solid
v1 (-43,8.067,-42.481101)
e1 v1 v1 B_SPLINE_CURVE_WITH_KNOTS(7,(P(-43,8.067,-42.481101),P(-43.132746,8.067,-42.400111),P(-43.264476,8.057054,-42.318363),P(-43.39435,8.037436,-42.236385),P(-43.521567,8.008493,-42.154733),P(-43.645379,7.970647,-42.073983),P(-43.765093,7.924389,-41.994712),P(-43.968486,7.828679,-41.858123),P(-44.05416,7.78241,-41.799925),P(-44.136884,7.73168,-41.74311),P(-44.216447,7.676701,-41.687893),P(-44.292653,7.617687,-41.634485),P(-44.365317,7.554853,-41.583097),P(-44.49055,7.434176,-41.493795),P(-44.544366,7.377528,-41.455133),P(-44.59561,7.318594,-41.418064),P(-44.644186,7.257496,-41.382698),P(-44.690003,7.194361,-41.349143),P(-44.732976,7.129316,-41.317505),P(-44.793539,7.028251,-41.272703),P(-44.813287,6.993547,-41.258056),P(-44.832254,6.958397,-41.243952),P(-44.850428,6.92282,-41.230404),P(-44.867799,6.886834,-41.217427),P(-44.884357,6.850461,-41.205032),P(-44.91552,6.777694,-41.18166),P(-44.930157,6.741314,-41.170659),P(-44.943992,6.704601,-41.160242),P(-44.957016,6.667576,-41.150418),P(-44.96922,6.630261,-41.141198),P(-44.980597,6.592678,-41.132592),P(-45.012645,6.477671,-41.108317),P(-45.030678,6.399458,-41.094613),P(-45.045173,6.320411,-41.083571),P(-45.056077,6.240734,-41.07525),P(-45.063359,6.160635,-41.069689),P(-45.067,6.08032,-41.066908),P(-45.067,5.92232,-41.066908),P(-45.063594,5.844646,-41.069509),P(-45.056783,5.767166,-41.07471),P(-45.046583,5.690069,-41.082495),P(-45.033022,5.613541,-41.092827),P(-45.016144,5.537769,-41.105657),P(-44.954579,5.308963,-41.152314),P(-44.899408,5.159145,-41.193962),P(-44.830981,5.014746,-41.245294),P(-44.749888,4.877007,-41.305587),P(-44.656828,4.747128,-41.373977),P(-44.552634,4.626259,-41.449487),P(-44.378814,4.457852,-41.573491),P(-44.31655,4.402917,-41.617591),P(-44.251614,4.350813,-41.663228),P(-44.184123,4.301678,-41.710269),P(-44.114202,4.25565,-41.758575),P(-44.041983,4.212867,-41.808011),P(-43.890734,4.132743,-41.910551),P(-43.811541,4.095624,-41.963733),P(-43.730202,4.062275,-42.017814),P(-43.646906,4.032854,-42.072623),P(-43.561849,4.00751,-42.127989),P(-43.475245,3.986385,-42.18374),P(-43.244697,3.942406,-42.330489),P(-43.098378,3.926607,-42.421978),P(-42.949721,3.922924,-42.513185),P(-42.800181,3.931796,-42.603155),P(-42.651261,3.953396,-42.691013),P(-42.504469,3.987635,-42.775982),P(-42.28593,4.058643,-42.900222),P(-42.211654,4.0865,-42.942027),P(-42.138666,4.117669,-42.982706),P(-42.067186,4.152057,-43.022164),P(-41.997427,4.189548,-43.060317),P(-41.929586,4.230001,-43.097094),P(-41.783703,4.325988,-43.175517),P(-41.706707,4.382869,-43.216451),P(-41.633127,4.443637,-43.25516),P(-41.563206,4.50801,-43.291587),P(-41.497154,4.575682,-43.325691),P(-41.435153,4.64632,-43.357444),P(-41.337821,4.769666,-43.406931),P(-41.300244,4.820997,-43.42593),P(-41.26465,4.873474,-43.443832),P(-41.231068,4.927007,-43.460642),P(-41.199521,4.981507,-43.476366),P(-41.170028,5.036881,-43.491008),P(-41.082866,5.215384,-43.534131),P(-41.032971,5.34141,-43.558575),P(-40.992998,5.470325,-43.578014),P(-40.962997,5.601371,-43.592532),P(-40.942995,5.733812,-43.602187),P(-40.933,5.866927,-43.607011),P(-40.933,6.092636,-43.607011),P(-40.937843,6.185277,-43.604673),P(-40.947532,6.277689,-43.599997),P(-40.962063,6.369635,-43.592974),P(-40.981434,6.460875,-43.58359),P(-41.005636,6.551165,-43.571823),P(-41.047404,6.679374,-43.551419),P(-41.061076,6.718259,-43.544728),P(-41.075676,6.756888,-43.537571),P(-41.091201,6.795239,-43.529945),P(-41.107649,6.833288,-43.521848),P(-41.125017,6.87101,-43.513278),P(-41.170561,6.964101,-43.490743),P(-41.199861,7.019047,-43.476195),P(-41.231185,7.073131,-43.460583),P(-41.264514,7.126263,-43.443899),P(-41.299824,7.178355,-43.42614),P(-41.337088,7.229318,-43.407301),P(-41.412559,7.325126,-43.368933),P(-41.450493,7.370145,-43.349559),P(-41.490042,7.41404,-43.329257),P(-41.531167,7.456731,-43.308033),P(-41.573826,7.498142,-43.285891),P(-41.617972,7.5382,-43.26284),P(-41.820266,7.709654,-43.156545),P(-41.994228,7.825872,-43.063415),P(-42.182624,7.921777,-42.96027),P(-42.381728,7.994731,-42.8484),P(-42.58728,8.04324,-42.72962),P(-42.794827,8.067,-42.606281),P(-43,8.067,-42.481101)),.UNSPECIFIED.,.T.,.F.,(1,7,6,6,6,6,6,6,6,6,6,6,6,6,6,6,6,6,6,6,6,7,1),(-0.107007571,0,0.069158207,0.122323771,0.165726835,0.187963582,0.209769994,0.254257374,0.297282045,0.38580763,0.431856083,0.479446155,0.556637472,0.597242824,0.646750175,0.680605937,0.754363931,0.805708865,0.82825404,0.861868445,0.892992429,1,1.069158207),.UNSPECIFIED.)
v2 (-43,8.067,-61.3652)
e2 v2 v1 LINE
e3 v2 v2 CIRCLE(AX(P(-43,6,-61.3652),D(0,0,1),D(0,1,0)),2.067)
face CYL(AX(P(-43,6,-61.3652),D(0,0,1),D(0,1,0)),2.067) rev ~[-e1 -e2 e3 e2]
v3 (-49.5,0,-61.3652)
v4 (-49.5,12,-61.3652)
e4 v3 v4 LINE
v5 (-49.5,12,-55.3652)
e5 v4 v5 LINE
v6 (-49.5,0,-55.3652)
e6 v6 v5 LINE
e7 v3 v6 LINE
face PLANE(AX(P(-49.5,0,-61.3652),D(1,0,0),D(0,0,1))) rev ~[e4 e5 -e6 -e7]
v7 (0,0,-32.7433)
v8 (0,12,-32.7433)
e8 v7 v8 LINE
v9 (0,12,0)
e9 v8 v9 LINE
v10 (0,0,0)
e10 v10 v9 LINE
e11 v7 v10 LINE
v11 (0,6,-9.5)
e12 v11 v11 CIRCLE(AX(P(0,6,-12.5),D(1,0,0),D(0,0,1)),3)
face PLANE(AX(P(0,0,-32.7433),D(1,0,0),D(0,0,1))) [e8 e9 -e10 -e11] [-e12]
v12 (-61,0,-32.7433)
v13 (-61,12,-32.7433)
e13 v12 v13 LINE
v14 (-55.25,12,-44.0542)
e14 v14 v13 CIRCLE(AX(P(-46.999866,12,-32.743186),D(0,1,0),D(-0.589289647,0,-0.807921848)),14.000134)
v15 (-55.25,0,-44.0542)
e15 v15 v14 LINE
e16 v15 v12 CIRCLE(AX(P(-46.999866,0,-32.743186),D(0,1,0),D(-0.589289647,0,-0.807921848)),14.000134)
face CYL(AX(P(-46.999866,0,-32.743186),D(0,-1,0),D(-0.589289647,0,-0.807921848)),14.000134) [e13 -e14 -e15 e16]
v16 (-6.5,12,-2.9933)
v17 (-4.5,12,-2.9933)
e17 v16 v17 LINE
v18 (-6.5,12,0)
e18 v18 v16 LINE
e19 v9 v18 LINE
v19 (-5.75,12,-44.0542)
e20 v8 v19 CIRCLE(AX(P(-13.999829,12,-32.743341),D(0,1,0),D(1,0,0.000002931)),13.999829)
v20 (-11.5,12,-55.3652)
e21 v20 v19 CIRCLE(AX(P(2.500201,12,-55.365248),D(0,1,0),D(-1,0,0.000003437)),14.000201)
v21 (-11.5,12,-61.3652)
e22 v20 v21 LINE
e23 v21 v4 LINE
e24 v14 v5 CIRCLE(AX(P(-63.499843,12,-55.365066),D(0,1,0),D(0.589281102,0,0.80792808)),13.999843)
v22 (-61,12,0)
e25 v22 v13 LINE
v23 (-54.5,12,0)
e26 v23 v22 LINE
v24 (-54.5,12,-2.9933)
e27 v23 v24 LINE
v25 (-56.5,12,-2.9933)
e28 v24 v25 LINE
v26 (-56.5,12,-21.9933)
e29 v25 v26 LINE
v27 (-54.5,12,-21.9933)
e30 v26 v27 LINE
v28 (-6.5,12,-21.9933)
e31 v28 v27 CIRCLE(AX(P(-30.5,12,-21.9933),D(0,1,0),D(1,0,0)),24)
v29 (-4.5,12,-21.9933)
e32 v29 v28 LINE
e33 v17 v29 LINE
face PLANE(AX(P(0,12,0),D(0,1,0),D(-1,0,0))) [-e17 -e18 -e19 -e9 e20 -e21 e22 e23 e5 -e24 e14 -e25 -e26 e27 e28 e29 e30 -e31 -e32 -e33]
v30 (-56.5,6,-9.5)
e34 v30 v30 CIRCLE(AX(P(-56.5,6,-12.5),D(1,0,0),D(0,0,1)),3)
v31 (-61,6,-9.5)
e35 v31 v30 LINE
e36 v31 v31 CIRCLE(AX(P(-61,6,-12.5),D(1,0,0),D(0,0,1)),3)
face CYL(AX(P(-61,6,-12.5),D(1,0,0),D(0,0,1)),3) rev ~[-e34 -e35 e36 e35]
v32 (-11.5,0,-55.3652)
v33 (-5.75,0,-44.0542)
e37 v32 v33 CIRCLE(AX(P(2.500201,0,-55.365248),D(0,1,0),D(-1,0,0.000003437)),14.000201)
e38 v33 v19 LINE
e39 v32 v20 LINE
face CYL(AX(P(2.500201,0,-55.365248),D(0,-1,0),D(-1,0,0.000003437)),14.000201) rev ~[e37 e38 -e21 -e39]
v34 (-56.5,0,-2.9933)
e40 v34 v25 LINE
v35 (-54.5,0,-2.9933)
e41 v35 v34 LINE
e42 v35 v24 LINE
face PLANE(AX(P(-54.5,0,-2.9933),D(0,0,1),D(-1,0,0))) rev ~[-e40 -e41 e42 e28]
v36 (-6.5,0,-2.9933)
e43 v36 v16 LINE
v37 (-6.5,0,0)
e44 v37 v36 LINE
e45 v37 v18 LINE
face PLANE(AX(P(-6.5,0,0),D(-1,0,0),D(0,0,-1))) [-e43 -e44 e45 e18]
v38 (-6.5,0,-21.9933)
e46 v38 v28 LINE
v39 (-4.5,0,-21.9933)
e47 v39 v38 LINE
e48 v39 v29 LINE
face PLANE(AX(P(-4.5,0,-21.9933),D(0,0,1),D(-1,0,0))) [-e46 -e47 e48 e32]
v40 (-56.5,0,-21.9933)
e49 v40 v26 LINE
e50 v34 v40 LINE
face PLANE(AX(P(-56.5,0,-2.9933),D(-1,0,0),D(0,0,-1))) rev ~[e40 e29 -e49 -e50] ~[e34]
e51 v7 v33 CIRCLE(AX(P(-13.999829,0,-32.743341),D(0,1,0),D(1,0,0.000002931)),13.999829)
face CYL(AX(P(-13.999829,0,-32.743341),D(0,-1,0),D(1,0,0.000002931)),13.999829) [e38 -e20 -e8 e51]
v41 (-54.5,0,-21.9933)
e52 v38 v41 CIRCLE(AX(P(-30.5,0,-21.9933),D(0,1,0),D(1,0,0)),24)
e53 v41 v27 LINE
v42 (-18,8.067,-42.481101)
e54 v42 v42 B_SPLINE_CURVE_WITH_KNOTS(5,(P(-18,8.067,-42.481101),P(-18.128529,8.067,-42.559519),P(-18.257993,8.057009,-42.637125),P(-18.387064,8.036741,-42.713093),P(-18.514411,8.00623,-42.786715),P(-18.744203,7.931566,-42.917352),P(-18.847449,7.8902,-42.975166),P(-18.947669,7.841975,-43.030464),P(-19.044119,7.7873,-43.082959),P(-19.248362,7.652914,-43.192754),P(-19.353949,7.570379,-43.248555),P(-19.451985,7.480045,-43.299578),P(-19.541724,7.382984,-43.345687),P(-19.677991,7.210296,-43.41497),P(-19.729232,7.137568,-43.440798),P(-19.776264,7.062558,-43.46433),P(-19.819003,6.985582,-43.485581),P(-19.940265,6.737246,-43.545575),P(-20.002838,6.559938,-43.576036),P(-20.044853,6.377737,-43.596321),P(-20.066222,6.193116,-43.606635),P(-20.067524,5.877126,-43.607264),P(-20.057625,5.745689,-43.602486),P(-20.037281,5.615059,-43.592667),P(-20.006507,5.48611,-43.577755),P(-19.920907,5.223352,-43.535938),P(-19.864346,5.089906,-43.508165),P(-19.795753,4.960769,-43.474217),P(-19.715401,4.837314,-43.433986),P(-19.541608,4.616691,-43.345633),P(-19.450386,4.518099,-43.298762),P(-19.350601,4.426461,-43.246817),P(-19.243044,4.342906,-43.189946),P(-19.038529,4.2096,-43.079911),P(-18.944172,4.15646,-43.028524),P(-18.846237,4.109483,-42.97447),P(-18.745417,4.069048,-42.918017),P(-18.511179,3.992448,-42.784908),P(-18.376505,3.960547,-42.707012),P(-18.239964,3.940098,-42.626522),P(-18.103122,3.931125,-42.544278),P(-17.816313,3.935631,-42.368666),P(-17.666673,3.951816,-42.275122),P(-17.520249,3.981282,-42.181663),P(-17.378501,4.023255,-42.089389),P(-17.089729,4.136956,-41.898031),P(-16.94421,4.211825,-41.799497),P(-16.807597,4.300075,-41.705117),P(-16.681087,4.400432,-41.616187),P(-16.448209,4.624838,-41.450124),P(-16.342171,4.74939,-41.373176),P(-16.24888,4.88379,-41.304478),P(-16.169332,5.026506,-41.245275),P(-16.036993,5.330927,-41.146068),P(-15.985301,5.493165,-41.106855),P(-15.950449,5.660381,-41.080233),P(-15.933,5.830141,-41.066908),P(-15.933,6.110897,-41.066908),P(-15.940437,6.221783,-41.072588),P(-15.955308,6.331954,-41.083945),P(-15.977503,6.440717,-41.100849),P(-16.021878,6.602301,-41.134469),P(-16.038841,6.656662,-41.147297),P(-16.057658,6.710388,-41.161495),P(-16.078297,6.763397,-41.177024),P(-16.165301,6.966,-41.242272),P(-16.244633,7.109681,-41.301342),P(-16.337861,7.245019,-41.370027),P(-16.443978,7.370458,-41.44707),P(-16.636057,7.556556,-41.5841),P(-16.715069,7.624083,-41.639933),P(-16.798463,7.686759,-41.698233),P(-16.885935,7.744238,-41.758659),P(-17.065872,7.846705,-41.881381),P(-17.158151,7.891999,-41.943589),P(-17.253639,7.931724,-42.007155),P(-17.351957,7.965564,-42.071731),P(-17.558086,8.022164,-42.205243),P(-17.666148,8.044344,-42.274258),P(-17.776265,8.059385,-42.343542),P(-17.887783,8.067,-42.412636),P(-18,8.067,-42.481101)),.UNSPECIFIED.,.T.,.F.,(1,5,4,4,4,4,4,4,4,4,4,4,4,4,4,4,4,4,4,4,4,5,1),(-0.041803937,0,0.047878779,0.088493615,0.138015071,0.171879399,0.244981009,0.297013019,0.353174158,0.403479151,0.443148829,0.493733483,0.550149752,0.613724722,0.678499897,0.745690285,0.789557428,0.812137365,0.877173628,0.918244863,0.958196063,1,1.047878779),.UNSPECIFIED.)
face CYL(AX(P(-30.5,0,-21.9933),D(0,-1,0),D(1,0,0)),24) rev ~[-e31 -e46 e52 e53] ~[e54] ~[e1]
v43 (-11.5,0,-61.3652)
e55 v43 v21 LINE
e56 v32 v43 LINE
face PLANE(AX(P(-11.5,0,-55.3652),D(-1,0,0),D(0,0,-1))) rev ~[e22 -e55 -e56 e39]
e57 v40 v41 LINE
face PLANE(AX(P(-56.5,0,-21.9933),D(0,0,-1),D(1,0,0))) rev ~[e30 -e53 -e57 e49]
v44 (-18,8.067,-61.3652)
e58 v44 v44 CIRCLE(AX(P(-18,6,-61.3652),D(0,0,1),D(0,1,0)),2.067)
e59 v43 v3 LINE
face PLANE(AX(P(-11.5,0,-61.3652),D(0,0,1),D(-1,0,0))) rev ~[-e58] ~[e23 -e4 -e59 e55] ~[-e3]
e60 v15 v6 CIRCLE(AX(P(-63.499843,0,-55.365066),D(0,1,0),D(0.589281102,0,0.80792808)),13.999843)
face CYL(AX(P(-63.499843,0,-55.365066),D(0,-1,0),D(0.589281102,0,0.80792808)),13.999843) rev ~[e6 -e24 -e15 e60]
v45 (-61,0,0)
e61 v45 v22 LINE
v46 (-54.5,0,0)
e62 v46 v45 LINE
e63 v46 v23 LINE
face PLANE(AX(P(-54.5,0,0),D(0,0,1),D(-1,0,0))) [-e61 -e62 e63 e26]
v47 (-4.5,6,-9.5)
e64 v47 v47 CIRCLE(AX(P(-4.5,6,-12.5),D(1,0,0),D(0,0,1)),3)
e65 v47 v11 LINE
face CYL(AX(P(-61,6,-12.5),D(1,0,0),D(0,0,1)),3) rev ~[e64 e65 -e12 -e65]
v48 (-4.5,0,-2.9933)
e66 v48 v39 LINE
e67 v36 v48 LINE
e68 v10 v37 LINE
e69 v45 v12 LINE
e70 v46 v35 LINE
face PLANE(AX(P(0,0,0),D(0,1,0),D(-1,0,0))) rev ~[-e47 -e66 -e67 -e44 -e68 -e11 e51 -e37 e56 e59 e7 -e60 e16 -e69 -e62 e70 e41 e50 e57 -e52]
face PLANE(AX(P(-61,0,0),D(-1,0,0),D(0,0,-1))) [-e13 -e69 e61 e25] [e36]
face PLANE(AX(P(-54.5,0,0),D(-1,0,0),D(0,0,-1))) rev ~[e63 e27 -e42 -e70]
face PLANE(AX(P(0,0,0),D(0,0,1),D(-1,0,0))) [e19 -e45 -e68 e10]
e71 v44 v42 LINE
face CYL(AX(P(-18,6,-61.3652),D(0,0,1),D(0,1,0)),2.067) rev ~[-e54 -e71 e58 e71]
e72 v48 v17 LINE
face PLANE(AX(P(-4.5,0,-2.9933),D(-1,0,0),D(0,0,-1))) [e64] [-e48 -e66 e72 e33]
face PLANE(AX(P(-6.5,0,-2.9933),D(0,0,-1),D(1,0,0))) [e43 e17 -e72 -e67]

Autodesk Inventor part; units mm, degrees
ref_plane "YZ Plane" through (0, 0, 0) normal (1, 0, 0) x (0, 1, 0)
ref_plane "XZ Plane" through (0, 0, 0) normal (0, 1, 0) x (-1, 0, 0)
ref_plane "XY Plane" through (0, 0, 0) normal (0, 0, 1) x (1, 0, 0)
sketch "Skizze1" plane through (0, 0, 0) normal (0, 1, 0) x (-1, 0, 0)
  line L0 (54.5, 0) -> (61, 0)
  line L1 (61, 0) -> (61, -32.7433)
  arc A0 (55.25, -44.0542) -> (61, -32.7433) centre (47, -32.7433) ccw
  arc A1 (55.25, -44.0542) -> (49.5, -55.3652) centre (63.5, -55.3652) ccw
  line L2 (54.5, 0) -> (54.5, -2.9933)
  line L3 (54.5, -2.9933) -> (56.5, -2.9933)
  line L4 (56.5, -2.9933) -> (56.5, -21.9933)
  line L5 (56.5, -21.9933) -> (54.5, -21.9933)
  arc A2 (6.5, -21.9933) -> (54.5, -21.9933) centre (30.5, -21.9933) ccw
  arc A3 (11.5, -55.3652) -> (5.75, -44.0542) centre (-2.5, -55.3652) ccw
  arc A4 (0, -32.7433) -> (5.75, -44.0542) centre (14, -32.7433) ccw
  line L6 (0, -32.7433) -> (0, 0)
  line L7 (0, 0) -> (6.5, 0)
  line L8 (6.5, 0) -> (6.5, -2.9933)
  line L9 (6.5, -2.9933) -> (4.5, -2.9933)
  line L10 (4.5, -2.9933) -> (4.5, -21.9933)
  line L11 (4.5, -21.9933) -> (6.5, -21.9933)
  line L12 (11.5, -55.3652) -> (11.5, -61.3652)
  line L13 (11.5, -61.3652) -> (49.5, -61.3652)
  line L14 (49.5, -61.3652) -> (49.5, -55.3652)
  line L15 (49.5, -55.3652) -> (49.5, -61.3652)
  line L16 (30.5, -51.8632) -> (30.5, -31.0026) construction
  point P0 (54.5, -1.4967)
  point P1 (6.5, -1.4967)
  point P2 (30.5, -21.9933)
  point P3 (30.5, -61.3652)
  point P4 (56.5, -12.4933)
  dimension "d2" = 2
  dimension "d3" = 19
  dimension "d4" = 14
  dimension "d5" = 14
  dimension "d6" = 38
  dimension "d10" = 19
  dimension "d12" = 2
  dimension "d13" = 24
  dimension "d14" = 24
  dimension "d18" = 4.5
  dimension "d19" = 4.5
  dimension "d20" = 24
  dimension "d54" = 19
  dimension "d55" = 6
  dimension "d56" = 14
  dimension "d57" = 14
  dimension "d58" = 42.8719
  dimension "d59" = 10.75
extrude "Extrusion1" add sketch "Skizze1" along normal blind 12
sketch "Skizze2" plane through (-11.5, 0, -61.3652) normal (0, 0, -1) x (-1, 0, 0)
  line L0 (0, 0) -> (0, 12) projected
  line L1 (0, 0) -> (38, 0) projected
  point P0 (-11.5, 0)
  point P1 (6.5, 6)
  point P2 (31.5, 6)
  point P3 (0, 6)
  point P4 (19, 0)
  dimension "d35" = 25
  dimension "d36" = 12.5
hole "Bohrung1" at (-18, 6, -61.3652) at (-43, 6, -61.3652) direction (0, 0, 1) diameter 4.134 end through all thread size "M5x0.8" class "6H" standard "ISO Metric profile"
sketch "Skizze3" plane through (0, 0, 0) normal (1, 0, 0) x (0, 0, -1)
  line L0 (0, 0) -> (0, 12) projected
  point P0 (12.5, 6)
  point P1 (0, 6)
  dimension "d44" = 12.5
hole "Bohrung2" at (0, 6, -12.5) direction (1, 0, 0) diameter 6 depth 4.5
sketch "Skizze4" plane through (-61, 0, -32.7433) normal (-1, 0, 0) x (0, 0, 1)
  line L0 (32.7433, 0) -> (32.7433, 12) projected
  point P0 (20.2433, 6)
  point P1 (32.7433, 6)
  dimension "d53" = 12.5
hole "Bohrung3" at (-61, 6, -12.5) direction (1, 0, 0) diameter 6 end through all
equation "\"d10\" = d3"
equation "\"d19\" = d18"
properties part number "102"
